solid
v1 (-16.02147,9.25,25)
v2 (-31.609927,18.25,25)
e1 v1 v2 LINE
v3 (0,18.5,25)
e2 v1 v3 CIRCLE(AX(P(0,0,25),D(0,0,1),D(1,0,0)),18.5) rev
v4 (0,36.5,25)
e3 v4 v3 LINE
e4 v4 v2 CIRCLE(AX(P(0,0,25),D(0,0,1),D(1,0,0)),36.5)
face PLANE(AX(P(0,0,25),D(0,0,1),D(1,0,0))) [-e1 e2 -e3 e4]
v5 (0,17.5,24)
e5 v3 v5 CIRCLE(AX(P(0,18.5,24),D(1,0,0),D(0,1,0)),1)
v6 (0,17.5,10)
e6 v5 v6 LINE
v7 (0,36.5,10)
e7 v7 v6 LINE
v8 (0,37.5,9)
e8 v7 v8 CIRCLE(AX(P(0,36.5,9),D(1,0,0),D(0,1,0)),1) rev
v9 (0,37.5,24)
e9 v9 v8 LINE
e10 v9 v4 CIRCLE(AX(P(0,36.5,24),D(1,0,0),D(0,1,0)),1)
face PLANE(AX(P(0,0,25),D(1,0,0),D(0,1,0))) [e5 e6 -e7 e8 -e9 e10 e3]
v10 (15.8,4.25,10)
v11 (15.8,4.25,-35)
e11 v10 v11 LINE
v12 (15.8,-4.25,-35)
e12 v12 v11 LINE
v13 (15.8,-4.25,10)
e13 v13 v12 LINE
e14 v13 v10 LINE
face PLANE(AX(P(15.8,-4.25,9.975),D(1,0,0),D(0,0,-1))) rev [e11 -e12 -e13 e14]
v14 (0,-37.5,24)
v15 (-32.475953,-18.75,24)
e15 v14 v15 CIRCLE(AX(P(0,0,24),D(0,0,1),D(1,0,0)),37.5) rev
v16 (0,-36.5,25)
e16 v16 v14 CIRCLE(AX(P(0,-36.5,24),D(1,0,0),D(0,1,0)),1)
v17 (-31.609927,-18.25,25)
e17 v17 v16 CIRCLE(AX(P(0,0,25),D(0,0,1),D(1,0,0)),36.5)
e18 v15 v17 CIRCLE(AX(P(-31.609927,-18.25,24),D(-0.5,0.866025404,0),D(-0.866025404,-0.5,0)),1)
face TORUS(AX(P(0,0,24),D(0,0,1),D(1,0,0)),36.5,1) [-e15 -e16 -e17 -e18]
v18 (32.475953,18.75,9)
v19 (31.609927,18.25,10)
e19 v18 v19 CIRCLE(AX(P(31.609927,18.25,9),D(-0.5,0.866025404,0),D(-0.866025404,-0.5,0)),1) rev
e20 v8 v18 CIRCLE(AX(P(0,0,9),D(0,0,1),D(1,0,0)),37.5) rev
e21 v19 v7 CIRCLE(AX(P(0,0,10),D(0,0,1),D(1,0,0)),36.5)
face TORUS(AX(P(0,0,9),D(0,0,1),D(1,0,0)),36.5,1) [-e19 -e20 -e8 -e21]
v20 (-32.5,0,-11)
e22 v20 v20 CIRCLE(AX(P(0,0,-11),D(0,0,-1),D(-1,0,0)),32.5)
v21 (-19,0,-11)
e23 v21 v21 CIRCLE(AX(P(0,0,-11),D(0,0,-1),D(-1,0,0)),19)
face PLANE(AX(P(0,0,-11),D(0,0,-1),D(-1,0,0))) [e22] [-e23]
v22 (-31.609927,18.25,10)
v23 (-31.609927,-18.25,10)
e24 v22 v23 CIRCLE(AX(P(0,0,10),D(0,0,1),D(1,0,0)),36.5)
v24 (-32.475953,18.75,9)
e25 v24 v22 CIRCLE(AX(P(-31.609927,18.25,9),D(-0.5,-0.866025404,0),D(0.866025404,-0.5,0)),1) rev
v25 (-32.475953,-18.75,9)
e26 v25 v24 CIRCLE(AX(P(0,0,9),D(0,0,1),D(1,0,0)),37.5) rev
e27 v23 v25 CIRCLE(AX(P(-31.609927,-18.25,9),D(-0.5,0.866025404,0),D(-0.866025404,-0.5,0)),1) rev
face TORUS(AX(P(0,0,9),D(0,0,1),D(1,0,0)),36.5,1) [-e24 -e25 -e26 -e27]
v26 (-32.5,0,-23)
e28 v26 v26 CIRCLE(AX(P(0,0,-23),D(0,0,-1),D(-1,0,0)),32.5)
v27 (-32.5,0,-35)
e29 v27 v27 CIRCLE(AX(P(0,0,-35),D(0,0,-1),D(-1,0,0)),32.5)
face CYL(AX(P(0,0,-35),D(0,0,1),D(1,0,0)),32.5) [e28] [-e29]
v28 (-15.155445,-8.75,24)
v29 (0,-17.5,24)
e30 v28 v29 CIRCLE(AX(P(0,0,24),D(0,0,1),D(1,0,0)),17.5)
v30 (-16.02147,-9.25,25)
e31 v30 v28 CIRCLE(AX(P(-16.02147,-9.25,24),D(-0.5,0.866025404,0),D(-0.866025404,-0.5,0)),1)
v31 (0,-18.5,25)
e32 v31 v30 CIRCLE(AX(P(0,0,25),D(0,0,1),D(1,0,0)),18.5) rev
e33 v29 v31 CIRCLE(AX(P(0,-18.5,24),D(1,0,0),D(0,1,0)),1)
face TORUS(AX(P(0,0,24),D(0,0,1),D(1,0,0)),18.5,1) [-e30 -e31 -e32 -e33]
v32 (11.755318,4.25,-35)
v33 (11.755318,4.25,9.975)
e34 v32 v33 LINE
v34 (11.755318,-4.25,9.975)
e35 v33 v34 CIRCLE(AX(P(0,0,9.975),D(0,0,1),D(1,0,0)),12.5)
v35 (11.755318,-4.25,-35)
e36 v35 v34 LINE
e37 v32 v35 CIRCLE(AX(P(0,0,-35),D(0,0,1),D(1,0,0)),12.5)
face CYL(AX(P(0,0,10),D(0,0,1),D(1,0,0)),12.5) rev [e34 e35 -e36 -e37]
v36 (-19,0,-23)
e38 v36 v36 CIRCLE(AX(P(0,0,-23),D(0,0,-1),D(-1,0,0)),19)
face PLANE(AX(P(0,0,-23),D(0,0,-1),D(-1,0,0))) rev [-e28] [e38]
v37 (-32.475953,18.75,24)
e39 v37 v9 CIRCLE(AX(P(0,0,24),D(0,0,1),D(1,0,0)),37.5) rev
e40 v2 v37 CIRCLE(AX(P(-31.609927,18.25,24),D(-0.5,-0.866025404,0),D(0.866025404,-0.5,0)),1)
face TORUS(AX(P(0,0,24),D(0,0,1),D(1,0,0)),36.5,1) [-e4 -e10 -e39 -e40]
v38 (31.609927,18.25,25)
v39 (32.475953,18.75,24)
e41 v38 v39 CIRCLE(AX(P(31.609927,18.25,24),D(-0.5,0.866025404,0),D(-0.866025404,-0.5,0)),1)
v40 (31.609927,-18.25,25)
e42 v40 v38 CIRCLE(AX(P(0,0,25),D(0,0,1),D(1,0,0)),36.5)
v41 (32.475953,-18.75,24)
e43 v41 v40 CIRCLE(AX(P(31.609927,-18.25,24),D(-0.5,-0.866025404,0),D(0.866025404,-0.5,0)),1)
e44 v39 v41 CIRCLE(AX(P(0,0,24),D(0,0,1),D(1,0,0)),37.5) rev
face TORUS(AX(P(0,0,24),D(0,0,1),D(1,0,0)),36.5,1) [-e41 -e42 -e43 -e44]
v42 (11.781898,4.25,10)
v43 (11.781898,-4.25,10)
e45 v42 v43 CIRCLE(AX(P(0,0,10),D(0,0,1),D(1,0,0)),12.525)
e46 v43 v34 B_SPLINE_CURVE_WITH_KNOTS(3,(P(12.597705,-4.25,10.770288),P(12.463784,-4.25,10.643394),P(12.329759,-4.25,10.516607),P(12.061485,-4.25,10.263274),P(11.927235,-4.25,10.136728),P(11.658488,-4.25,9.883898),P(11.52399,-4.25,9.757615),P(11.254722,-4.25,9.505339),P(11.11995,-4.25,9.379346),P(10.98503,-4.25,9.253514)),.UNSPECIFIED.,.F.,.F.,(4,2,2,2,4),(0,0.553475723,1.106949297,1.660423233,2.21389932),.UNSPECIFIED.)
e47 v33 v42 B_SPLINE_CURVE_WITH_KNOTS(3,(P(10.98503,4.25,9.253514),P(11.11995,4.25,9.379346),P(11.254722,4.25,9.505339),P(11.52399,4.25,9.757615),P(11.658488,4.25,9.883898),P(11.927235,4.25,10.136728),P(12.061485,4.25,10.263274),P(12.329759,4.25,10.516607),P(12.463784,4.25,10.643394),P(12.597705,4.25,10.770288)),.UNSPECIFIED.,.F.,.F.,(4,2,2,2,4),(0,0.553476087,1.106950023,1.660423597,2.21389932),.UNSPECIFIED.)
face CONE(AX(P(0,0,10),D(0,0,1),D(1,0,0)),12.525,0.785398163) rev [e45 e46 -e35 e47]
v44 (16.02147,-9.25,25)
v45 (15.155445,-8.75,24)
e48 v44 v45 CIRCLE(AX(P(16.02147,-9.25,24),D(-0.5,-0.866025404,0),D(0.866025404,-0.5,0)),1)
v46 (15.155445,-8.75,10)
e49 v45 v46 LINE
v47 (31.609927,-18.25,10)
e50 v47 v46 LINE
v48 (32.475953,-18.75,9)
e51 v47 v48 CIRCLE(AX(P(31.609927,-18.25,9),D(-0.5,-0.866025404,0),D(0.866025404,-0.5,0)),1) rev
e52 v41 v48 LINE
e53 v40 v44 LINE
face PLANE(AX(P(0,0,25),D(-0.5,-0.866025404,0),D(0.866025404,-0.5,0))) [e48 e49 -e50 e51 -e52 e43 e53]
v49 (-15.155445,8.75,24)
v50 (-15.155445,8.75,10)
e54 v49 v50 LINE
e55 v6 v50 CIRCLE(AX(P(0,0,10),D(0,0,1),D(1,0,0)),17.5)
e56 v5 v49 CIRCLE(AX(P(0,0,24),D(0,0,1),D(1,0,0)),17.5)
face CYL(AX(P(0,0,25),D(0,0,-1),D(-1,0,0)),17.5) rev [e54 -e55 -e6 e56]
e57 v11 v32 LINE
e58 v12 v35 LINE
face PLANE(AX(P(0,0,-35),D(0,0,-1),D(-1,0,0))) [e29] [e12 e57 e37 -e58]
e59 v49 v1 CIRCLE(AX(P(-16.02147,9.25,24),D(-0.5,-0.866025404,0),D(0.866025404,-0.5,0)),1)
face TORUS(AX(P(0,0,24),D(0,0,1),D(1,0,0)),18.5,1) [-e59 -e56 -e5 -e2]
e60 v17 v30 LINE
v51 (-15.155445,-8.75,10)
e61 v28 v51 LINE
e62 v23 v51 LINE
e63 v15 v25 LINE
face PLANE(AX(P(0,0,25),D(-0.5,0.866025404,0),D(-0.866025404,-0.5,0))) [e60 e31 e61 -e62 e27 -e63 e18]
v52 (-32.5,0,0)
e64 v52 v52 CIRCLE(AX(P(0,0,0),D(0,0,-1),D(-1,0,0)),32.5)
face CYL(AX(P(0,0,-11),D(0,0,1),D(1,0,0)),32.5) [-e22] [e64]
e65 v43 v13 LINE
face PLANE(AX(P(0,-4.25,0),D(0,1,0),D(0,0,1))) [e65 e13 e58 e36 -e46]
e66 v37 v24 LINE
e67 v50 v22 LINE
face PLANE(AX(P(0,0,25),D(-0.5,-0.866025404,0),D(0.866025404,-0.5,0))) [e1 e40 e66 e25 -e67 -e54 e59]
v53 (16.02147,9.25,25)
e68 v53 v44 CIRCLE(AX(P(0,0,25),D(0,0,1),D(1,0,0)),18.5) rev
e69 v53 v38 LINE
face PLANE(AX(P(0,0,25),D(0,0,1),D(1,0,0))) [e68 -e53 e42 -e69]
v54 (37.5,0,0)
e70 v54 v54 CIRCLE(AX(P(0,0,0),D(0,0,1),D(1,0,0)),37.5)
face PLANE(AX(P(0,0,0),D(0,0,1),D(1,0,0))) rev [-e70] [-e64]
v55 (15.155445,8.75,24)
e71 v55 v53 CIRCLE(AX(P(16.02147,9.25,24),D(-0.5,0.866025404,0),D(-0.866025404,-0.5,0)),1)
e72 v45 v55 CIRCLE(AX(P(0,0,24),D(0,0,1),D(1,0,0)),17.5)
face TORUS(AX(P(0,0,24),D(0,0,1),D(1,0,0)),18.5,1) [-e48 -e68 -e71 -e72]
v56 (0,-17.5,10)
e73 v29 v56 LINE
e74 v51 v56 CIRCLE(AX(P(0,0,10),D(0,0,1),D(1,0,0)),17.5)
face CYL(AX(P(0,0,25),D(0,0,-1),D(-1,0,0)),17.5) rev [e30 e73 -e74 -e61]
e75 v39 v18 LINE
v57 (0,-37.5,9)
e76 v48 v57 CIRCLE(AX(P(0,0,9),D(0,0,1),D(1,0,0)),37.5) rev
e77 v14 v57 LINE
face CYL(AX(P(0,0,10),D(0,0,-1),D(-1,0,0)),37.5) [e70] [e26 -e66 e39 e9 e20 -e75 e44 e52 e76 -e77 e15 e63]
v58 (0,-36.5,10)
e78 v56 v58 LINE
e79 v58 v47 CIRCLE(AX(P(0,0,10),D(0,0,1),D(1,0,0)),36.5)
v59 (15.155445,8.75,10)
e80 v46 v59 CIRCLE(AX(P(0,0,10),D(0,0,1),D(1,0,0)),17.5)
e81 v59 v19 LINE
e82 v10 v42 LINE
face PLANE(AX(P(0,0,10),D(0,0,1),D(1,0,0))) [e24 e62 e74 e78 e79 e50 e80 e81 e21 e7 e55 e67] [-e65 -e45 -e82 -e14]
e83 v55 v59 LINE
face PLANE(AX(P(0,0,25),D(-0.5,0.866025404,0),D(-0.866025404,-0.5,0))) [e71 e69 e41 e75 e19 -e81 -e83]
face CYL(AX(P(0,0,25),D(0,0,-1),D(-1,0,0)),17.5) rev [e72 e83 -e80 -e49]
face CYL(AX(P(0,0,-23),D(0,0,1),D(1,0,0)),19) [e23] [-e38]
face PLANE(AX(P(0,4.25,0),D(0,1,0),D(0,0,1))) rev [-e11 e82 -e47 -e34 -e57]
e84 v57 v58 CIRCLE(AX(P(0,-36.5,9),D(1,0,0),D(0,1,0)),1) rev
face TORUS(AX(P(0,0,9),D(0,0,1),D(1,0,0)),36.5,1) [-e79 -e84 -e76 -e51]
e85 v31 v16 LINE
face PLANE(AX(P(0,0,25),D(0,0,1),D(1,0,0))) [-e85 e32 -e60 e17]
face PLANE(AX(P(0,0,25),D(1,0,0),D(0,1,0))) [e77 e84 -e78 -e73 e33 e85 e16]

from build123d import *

# Parameters (mm, degrees)
SKETCH1_R                        = 37.5
BOSS_EXTRUDE1_DEPTH              = 10
SKETCH2_R                        = 32.5
BOSS_EXTRUDE2_DEPTH              = 11
SKETCH3_R                        = 19
BOSS_EXTRUDE3_DEPTH              = 12
SKETCH4_R                        = 32.5
BOSS_EXTRUDE4_DEPTH              = 12
BOSS_EXTRUDE5_DEPTH              = 15
FILLET1_R                        = 1
F_25_0MM_DOWEL_HOLE1_D           = 25
F_25_0MM_DOWEL_HOLE1_CSINK_D     = 25.05
F_25_0MM_DOWEL_HOLE1_CSINK_ANGLE = 90
SKETCH9_W                        = 15.8
SKETCH9_H                        = 44.975
CUT_EXTRUDE2_DEPTH               = 4.25
CUT_EXTRUDE3_DEPTH               = 4.25


with BuildPart() as part:
    # Sketch1 → Boss-Extrude1 (new body)
    with BuildSketch(Plane.XY):
        Circle(SKETCH1_R)
    extrude(amount=BOSS_EXTRUDE1_DEPTH)

    # Sketch2 → Boss-Extrude2 (add)
    with BuildSketch(Plane(origin=(0, 0, 0), x_dir=(-1, 0, 0), z_dir=(0, 0, -1))):
        Circle(SKETCH2_R)
    extrude(amount=BOSS_EXTRUDE2_DEPTH)

    # Sketch3 → Boss-Extrude3 (add)
    with BuildSketch(Plane(origin=(0, 0, -11), x_dir=(-1, 0, 0), z_dir=(0, 0, -1))):
        Circle(SKETCH3_R)
    extrude(amount=BOSS_EXTRUDE3_DEPTH)

    # Sketch4 → Boss-Extrude4 (add)
    with BuildSketch(Plane(origin=(0, 0, -23), x_dir=(-1, 0, 0), z_dir=(0, 0, -1))):
        Circle(SKETCH4_R)
    extrude(amount=BOSS_EXTRUDE4_DEPTH)

    # Sketch5 → Boss-Extrude5 (add)
    with BuildSketch(Plane.XY.offset(10)):
        with BuildLine():
            Line((0, 17.5), (0, 37.5))
            ThreePointArc((0, 37.5), (-18.75, 32.475952642), (-32.475952642, 18.75))
            Line((-32.475952642, 18.75), (-15.155444566, 8.75))
            ThreePointArc((-15.155444566, 8.75), (-8.75, 15.155444566), (0, 17.5))
        make_face()
        with BuildLine():
            Line((-15.155444566, -8.75), (-32.475952642, -18.75))
            ThreePointArc((-32.475952642, -18.75), (-18.75, -32.475952642), (0, -37.5))
            Line((0, -37.5), (0, -17.5))
            ThreePointArc((0, -17.5), (-8.75, -15.155444566), (-15.155444566, -8.75))
        make_face()
        with BuildLine():
            ThreePointArc((37.5, 0), (36.222218486, 9.705714191), (32.475952642, 18.75))
            Line((32.475952642, 18.75), (15.155444566, 8.75))
            ThreePointArc((15.155444566, 8.75), (16.90370196, 4.529333289), (17.5, 0))
            ThreePointArc((17.5, 0), (16.90370196, -4.529333289), (15.155444566, -8.75))
            Line((15.155444566, -8.75), (32.475952642, -18.75))
            ThreePointArc((32.475952642, -18.75), (36.222218486, -9.705714191), (37.5, 0))
        make_face()
    extrude(amount=BOSS_EXTRUDE5_DEPTH)

    # Fillet1
    # the kernel refuses this fillet: 1 mm, written as the material it takes off along each edge
    with BuildSketch(Plane(origin=(0, 0, 10), x_dir=(-0.8660254037844362, 0.5000000000000042, 0), z_dir=(0.5000000000000042, 0.8660254037844362, 0))) as fillet1_piece_1:
        with BuildLine():
            CenterArc((37.5 - FILLET1_R, -FILLET1_R), FILLET1_R, 0, 90)
            Line((37.5 - FILLET1_R, 0), (37.5, 0))
            Line((37.5, 0), (37.5, -FILLET1_R))
        make_face()
    revolve(axis=Axis((0, 0, 10), (0, 0, 1)), revolution_arc=60, mode=Mode.SUBTRACT)
    with BuildSketch(Plane(origin=(0, 0, 25), x_dir=(-0.9283987696572769, 0.37158542019144725, 0), z_dir=(-0.37158542019144725, -0.9283987696572769, 0))) as fillet1_piece_2:
        with BuildLine():
            CenterArc((17.5 + FILLET1_R, FILLET1_R), FILLET1_R, 180, 90)
            Line((17.5 + FILLET1_R, 0), (17.5, 0))
            Line((17.5, 0), (17.5, FILLET1_R))
        make_face()
    revolve(axis=Axis((0, 0, 25), (0, 0, -1)), revolution_arc=76.373144951, mode=Mode.SUBTRACT)
    with BuildSketch(Plane(origin=(0, 0, 25), x_dir=(0.06662916908749308, 0.9977778078443669, 0), z_dir=(0.9977778078443669, -0.06662916908749308, 0))) as fillet1_piece_3:
        with BuildLine():
            CenterArc((37.5 - FILLET1_R, -FILLET1_R), FILLET1_R, 0, 90)
            Line((37.5 - FILLET1_R, 0), (37.5, 0))
            Line((37.5, 0), (37.5, -FILLET1_R))
        make_face()
    revolve(axis=Axis((0, 0, 25), (0, 0, 1)), revolution_arc=67.640800977, mode=Mode.SUBTRACT)
    with BuildSketch(Plane(origin=(0, 0, 10), x_dir=(0, -1, 0), z_dir=(-1, 0, 0))) as fillet1_piece_4:
        with BuildLine():
            CenterArc((37.5 - FILLET1_R, -FILLET1_R), FILLET1_R, 0, 90)
            Line((37.5 - FILLET1_R, 0), (37.5, 0))
            Line((37.5, 0), (37.5, -FILLET1_R))
        make_face()
    revolve(axis=Axis((0, 0, 10), (0, 0, 1)), revolution_arc=60, mode=Mode.SUBTRACT)
    with BuildSketch(Plane(origin=(0, 0, 25), x_dir=(0.14239697126692002, -0.9898096294611445, 0), z_dir=(0.9898096294611445, 0.14239697126692002, 0))) as fillet1_piece_5:
        with BuildLine():
            CenterArc((17.5 + FILLET1_R, FILLET1_R), FILLET1_R, 180, 90)
            Line((17.5 + FILLET1_R, 0), (17.5, 0))
            Line((17.5, 0), (17.5, FILLET1_R))
        make_face()
    revolve(axis=Axis((0, 0, 25), (0, 0, -1)), revolution_arc=76.373144951, mode=Mode.SUBTRACT)
    with BuildSketch(Plane(origin=(0, 0, 25), x_dir=(-0.8974155134693206, -0.44118635085935703, 0), z_dir=(-0.44118635085935703, 0.8974155134693206, 0))) as fillet1_piece_6:
        with BuildLine():
            CenterArc((37.5 - FILLET1_R, -FILLET1_R), FILLET1_R, 0, 90)
            Line((37.5 - FILLET1_R, 0), (37.5, 0))
            Line((37.5, 0), (37.5, -FILLET1_R))
        make_face()
    revolve(axis=Axis((0, 0, 25), (0, 0, 1)), revolution_arc=67.640800977, mode=Mode.SUBTRACT)
    with BuildSketch(Plane(origin=(0, 0, 10), x_dir=(0.8660254037844433, 0.49999999999999195, 0), z_dir=(0.49999999999999195, -0.8660254037844433, 0))) as fillet1_piece_7:
        with BuildLine():
            CenterArc((37.5 - FILLET1_R, -FILLET1_R), FILLET1_R, 0, 90)
            Line((37.5 - FILLET1_R, 0), (37.5, 0))
            Line((37.5, 0), (37.5, -FILLET1_R))
        make_face()
    revolve(axis=Axis((0, 0, 10), (0, 0, 1)), revolution_arc=60, mode=Mode.SUBTRACT)
    with BuildSketch(Plane(origin=(0, 0, 25), x_dir=(0.7860017983903416, -0.6182242092697025, 0), z_dir=(-0.6182242092697025, -0.7860017983903416, 0))) as fillet1_piece_8:
        with BuildLine():
            CenterArc((17.5 + FILLET1_R, -FILLET1_R), FILLET1_R, 90, 90)
            Line((17.5, -FILLET1_R), (17.5, 0))
            Line((17.5, 0), (17.5 + FILLET1_R, 0))
        make_face()
    revolve(axis=Axis((0, 0, 25), (0, 0, 1)), revolution_arc=76.373144951, mode=Mode.SUBTRACT)
    with BuildSketch(Plane(origin=(0, 0, 25), x_dir=(0.8307863443818282, 0.5565914569849941, 0), z_dir=(-0.5565914569849941, 0.8307863443818282, 0))) as fillet1_piece_9:
        with BuildLine():
            CenterArc((37.5 - FILLET1_R, FILLET1_R), FILLET1_R, 270, 90)
            Line((37.5 - FILLET1_R, 0), (37.5, 0))
            Line((37.5, 0), (37.5, FILLET1_R))
        make_face()
    revolve(axis=Axis((0, 0, 25), (0, 0, -1)), revolution_arc=67.640800977, mode=Mode.SUBTRACT)

    # Ø25.0mm Dowel Hole1 (through all)
    with Locations(Plane.XY.offset(10)):
        with Locations((0, 0)):
            CounterSinkHole(F_25_0MM_DOWEL_HOLE1_D / 2, F_25_0MM_DOWEL_HOLE1_CSINK_D / 2, counter_sink_angle=F_25_0MM_DOWEL_HOLE1_CSINK_ANGLE)

    # Sketch9 → Cut-Extrude2 (cut, symmetric)
    with BuildSketch(Plane(origin=(0, 0, 0), x_dir=(1, 0, 0), z_dir=(0, 1, 0))):
        with Locations((7.9, 12.5125)):
            Rectangle(SKETCH9_W, SKETCH9_H)
    extrude(amount=CUT_EXTRUDE2_DEPTH, both=True, mode=Mode.SUBTRACT)

    # Sketch12 → Cut-Extrude3 (cut, symmetric)
    with BuildSketch(Plane(origin=(0, 0, 9.975), x_dir=(-1, 0, 0), z_dir=(0, 0, -1))):
        with BuildLine():
            Line((-11.755317946, 4.25), (-15.8, 4.25))
            Line((-15.8, 4.25), (-15.8, -4.25))
            Line((-15.8, -4.25), (-11.755317946, -4.25))
            ThreePointArc((-11.755317946, -4.25), (-12.5, 0), (-11.755317946, 4.25))
        make_face()
    extrude(amount=CUT_EXTRUDE3_DEPTH, both=True, mode=Mode.SUBTRACT)


solid = part.part
